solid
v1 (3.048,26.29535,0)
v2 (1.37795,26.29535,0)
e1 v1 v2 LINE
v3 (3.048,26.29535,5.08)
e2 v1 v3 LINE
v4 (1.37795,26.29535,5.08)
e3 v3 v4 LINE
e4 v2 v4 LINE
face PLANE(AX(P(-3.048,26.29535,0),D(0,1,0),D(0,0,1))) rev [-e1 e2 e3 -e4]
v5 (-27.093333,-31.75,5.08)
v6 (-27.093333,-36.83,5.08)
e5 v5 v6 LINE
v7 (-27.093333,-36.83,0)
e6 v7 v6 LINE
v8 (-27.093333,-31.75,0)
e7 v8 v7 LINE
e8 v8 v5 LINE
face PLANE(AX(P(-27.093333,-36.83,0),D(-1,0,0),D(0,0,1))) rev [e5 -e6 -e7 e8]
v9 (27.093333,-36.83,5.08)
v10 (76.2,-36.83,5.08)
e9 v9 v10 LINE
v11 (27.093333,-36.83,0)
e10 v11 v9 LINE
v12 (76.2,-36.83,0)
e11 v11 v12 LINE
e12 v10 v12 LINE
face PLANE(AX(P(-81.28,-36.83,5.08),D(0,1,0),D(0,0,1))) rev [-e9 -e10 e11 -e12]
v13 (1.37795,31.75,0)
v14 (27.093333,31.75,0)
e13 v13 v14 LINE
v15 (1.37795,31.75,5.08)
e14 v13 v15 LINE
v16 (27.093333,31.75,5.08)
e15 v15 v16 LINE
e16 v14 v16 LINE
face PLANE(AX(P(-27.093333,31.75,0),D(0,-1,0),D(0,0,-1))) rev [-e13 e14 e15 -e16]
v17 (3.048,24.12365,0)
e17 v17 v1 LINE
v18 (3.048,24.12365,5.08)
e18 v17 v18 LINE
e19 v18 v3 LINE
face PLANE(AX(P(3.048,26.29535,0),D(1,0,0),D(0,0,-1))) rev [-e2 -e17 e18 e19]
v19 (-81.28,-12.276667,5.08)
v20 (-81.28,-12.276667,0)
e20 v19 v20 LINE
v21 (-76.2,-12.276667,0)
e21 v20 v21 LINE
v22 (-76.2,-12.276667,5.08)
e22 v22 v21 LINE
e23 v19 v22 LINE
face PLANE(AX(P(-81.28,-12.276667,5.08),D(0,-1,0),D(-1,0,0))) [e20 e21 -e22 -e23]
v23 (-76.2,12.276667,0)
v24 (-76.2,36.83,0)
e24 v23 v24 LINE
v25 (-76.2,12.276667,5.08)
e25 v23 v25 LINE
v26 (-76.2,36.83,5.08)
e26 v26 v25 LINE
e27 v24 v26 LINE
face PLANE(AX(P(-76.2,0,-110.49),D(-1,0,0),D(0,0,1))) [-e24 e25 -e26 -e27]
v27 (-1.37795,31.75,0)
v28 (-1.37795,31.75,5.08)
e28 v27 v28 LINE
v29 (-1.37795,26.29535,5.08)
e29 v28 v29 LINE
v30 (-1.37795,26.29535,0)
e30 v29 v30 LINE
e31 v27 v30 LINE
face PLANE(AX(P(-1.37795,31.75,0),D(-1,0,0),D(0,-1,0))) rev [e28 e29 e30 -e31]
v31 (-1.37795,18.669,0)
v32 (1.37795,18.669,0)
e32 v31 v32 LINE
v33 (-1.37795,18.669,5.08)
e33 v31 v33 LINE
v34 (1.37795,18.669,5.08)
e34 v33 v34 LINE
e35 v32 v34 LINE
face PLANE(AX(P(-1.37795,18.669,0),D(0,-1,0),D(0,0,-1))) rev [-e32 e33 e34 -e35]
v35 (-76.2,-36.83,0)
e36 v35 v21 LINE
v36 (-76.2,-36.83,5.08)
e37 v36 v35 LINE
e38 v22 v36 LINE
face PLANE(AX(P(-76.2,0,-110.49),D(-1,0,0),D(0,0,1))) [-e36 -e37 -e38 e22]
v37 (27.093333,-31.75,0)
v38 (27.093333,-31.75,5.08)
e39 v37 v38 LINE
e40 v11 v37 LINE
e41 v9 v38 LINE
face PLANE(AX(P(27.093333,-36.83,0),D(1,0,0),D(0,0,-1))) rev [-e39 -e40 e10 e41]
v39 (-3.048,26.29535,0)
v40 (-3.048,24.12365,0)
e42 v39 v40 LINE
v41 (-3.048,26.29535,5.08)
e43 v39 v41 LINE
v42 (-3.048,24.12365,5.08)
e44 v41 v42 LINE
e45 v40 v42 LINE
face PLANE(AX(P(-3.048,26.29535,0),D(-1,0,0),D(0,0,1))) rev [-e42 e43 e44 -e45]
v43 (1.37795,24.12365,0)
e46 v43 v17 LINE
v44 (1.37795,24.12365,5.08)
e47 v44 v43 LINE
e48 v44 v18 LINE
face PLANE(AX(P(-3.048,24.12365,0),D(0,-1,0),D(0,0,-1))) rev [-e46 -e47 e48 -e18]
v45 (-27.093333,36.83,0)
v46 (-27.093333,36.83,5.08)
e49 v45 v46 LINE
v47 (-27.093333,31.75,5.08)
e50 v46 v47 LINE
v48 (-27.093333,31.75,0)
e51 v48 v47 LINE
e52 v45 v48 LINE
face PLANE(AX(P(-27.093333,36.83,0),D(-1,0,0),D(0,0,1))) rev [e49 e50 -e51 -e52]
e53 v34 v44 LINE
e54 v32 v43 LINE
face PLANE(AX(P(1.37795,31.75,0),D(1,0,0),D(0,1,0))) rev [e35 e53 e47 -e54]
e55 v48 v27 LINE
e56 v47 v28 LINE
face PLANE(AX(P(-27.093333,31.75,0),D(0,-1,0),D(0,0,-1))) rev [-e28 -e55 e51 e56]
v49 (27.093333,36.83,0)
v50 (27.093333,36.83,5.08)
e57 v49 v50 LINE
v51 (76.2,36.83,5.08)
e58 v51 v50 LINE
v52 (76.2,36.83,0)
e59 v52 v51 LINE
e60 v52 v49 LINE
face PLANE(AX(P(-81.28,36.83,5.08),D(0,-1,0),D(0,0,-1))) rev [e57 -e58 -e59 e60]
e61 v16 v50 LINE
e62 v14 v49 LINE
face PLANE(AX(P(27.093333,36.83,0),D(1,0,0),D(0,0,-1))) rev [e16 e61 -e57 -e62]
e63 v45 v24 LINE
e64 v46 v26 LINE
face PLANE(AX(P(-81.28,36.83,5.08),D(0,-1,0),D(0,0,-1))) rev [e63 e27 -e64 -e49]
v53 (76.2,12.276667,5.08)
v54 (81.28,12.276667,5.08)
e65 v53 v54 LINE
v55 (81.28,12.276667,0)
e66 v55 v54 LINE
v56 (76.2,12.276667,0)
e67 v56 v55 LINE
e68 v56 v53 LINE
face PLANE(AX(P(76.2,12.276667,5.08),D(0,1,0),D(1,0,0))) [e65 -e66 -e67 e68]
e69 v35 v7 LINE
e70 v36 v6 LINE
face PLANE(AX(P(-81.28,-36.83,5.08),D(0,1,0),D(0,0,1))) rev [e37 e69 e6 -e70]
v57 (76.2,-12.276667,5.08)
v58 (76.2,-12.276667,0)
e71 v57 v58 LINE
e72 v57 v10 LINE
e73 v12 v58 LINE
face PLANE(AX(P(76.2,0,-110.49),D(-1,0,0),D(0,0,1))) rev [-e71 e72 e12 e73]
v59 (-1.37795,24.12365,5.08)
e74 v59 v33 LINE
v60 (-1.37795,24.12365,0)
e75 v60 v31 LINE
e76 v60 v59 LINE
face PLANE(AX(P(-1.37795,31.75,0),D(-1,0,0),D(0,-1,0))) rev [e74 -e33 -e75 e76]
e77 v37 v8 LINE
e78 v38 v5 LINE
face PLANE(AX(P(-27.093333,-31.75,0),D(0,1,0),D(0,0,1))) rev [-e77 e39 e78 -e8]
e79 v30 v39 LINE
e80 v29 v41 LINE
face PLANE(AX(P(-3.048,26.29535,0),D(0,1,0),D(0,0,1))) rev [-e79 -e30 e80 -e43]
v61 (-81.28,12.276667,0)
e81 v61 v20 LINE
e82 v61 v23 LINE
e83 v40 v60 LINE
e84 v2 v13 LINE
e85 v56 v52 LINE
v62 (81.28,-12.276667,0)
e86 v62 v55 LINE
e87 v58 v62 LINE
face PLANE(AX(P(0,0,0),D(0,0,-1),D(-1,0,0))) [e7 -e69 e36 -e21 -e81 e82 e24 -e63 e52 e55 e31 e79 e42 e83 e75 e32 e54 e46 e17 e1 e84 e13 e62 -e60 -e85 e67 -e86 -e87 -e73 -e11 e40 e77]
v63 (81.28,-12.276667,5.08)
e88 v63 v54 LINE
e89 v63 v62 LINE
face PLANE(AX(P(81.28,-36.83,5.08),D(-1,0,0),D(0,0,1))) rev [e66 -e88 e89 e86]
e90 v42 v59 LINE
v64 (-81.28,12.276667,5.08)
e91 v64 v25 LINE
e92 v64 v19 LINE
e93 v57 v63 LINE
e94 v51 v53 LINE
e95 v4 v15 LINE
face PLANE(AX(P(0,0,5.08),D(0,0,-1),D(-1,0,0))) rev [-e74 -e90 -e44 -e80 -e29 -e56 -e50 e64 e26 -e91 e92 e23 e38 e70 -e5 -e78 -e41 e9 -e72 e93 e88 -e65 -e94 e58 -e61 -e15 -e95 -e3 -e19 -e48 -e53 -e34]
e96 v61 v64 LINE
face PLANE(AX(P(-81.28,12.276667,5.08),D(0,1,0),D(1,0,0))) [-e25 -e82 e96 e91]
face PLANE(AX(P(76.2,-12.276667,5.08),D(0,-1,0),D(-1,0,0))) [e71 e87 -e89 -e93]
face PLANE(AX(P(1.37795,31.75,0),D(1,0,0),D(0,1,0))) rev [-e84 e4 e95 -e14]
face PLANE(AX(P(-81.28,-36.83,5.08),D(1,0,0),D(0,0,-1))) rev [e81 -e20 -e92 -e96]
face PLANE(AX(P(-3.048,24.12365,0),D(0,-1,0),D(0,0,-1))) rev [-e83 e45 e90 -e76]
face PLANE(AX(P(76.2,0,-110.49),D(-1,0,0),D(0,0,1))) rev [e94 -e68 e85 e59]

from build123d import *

# Parameters (mm, degrees)
SKETCH1_W           = 162.56
SKETCH1_H           = 73.66
BOSS_EXTRUDE1_DEPTH = 5.08
SKETCH2_W           = 54.186666666
SKETCH2_H           = 5.08
CUT_EXTRUDE1_DEPTH  = 90.379492614
SKETCH5_W           = 2.7559
SKETCH5_H           = 13.081
CUT_EXTRUDE4_DEPTH  = 90.379492614
SKETCH6_W           = 6.096
SKETCH6_H           = 2.1717
CUT_EXTRUDE5_DEPTH  = 90.379492614
CAVITY1_START       = -36.83
CAVITY1_OUTLINE_W   = 5.08
CAVITY1_OUTLINE_H   = 5.08
CAVITY1_DEPTH       = 24.553333333
CAVITY1_START_2     = 12.276666667
CAVITY1_2_OUTLINE_W = 5.08
CAVITY1_2_OUTLINE_H = 5.08
CAVITY1_2_DEPTH     = 24.553333333


# Read off the part's stored shape, not the designer's step: Cavity1
with BuildPart() as part:
    # Sketch1 → Boss-Extrude1 (new body)
    with BuildSketch(Plane.XY):
        Rectangle(SKETCH1_W, SKETCH1_H)
    extrude(amount=BOSS_EXTRUDE1_DEPTH)

    # Sketch2 → Cut-Extrude1 (cut, through all)
    with BuildSketch(Plane.XY.offset(5.08)):
        with Locations((0, -34.29)):
            Rectangle(SKETCH2_W, SKETCH2_H)
        with Locations((0, 34.29)):
            Rectangle(SKETCH2_W, SKETCH2_H)
    extrude(amount=-CUT_EXTRUDE1_DEPTH, mode=Mode.SUBTRACT)

    # Sketch5 → Cut-Extrude4 (cut, through all)
    with BuildSketch(Plane.XY.offset(5.08)):
        with Locations((0, 25.2095)):
            Rectangle(SKETCH5_W, SKETCH5_H)
    extrude(amount=-CUT_EXTRUDE4_DEPTH, mode=Mode.SUBTRACT)

    # Sketch6 → Cut-Extrude5 (cut, through all)
    with BuildSketch(Plane.XY.offset(5.08)):
        with Locations((0, 25.2095)):
            Rectangle(SKETCH6_W, SKETCH6_H)
    extrude(amount=-CUT_EXTRUDE5_DEPTH, mode=Mode.SUBTRACT)

    # Cavity1 outline → Cavity1 (cut)
    with BuildSketch(Plane(origin=(0, 0, 0), x_dir=(1, 0, 0), z_dir=(0, 1, 0)).offset(CAVITY1_START)):
        with Locations((78.74, -2.54)):
            Rectangle(CAVITY1_OUTLINE_W, CAVITY1_OUTLINE_H)
        with Locations((-78.74, -2.54)):
            Rectangle(CAVITY1_OUTLINE_W, CAVITY1_OUTLINE_H)
    extrude(amount=CAVITY1_DEPTH, mode=Mode.SUBTRACT)

    # Cavity1 2 outline → Cavity1 2 (cut)
    with BuildSketch(Plane(origin=(0, 0, 0), x_dir=(1, 0, 0), z_dir=(0, 1, 0)).offset(CAVITY1_START_2)):
        with Locations((78.74, -2.54)):
            Rectangle(CAVITY1_2_OUTLINE_W, CAVITY1_2_OUTLINE_H)
        with Locations((-78.74, -2.54)):
            Rectangle(CAVITY1_2_OUTLINE_W, CAVITY1_2_OUTLINE_H)
    extrude(amount=CAVITY1_2_DEPTH, mode=Mode.SUBTRACT)


solid = part.part
